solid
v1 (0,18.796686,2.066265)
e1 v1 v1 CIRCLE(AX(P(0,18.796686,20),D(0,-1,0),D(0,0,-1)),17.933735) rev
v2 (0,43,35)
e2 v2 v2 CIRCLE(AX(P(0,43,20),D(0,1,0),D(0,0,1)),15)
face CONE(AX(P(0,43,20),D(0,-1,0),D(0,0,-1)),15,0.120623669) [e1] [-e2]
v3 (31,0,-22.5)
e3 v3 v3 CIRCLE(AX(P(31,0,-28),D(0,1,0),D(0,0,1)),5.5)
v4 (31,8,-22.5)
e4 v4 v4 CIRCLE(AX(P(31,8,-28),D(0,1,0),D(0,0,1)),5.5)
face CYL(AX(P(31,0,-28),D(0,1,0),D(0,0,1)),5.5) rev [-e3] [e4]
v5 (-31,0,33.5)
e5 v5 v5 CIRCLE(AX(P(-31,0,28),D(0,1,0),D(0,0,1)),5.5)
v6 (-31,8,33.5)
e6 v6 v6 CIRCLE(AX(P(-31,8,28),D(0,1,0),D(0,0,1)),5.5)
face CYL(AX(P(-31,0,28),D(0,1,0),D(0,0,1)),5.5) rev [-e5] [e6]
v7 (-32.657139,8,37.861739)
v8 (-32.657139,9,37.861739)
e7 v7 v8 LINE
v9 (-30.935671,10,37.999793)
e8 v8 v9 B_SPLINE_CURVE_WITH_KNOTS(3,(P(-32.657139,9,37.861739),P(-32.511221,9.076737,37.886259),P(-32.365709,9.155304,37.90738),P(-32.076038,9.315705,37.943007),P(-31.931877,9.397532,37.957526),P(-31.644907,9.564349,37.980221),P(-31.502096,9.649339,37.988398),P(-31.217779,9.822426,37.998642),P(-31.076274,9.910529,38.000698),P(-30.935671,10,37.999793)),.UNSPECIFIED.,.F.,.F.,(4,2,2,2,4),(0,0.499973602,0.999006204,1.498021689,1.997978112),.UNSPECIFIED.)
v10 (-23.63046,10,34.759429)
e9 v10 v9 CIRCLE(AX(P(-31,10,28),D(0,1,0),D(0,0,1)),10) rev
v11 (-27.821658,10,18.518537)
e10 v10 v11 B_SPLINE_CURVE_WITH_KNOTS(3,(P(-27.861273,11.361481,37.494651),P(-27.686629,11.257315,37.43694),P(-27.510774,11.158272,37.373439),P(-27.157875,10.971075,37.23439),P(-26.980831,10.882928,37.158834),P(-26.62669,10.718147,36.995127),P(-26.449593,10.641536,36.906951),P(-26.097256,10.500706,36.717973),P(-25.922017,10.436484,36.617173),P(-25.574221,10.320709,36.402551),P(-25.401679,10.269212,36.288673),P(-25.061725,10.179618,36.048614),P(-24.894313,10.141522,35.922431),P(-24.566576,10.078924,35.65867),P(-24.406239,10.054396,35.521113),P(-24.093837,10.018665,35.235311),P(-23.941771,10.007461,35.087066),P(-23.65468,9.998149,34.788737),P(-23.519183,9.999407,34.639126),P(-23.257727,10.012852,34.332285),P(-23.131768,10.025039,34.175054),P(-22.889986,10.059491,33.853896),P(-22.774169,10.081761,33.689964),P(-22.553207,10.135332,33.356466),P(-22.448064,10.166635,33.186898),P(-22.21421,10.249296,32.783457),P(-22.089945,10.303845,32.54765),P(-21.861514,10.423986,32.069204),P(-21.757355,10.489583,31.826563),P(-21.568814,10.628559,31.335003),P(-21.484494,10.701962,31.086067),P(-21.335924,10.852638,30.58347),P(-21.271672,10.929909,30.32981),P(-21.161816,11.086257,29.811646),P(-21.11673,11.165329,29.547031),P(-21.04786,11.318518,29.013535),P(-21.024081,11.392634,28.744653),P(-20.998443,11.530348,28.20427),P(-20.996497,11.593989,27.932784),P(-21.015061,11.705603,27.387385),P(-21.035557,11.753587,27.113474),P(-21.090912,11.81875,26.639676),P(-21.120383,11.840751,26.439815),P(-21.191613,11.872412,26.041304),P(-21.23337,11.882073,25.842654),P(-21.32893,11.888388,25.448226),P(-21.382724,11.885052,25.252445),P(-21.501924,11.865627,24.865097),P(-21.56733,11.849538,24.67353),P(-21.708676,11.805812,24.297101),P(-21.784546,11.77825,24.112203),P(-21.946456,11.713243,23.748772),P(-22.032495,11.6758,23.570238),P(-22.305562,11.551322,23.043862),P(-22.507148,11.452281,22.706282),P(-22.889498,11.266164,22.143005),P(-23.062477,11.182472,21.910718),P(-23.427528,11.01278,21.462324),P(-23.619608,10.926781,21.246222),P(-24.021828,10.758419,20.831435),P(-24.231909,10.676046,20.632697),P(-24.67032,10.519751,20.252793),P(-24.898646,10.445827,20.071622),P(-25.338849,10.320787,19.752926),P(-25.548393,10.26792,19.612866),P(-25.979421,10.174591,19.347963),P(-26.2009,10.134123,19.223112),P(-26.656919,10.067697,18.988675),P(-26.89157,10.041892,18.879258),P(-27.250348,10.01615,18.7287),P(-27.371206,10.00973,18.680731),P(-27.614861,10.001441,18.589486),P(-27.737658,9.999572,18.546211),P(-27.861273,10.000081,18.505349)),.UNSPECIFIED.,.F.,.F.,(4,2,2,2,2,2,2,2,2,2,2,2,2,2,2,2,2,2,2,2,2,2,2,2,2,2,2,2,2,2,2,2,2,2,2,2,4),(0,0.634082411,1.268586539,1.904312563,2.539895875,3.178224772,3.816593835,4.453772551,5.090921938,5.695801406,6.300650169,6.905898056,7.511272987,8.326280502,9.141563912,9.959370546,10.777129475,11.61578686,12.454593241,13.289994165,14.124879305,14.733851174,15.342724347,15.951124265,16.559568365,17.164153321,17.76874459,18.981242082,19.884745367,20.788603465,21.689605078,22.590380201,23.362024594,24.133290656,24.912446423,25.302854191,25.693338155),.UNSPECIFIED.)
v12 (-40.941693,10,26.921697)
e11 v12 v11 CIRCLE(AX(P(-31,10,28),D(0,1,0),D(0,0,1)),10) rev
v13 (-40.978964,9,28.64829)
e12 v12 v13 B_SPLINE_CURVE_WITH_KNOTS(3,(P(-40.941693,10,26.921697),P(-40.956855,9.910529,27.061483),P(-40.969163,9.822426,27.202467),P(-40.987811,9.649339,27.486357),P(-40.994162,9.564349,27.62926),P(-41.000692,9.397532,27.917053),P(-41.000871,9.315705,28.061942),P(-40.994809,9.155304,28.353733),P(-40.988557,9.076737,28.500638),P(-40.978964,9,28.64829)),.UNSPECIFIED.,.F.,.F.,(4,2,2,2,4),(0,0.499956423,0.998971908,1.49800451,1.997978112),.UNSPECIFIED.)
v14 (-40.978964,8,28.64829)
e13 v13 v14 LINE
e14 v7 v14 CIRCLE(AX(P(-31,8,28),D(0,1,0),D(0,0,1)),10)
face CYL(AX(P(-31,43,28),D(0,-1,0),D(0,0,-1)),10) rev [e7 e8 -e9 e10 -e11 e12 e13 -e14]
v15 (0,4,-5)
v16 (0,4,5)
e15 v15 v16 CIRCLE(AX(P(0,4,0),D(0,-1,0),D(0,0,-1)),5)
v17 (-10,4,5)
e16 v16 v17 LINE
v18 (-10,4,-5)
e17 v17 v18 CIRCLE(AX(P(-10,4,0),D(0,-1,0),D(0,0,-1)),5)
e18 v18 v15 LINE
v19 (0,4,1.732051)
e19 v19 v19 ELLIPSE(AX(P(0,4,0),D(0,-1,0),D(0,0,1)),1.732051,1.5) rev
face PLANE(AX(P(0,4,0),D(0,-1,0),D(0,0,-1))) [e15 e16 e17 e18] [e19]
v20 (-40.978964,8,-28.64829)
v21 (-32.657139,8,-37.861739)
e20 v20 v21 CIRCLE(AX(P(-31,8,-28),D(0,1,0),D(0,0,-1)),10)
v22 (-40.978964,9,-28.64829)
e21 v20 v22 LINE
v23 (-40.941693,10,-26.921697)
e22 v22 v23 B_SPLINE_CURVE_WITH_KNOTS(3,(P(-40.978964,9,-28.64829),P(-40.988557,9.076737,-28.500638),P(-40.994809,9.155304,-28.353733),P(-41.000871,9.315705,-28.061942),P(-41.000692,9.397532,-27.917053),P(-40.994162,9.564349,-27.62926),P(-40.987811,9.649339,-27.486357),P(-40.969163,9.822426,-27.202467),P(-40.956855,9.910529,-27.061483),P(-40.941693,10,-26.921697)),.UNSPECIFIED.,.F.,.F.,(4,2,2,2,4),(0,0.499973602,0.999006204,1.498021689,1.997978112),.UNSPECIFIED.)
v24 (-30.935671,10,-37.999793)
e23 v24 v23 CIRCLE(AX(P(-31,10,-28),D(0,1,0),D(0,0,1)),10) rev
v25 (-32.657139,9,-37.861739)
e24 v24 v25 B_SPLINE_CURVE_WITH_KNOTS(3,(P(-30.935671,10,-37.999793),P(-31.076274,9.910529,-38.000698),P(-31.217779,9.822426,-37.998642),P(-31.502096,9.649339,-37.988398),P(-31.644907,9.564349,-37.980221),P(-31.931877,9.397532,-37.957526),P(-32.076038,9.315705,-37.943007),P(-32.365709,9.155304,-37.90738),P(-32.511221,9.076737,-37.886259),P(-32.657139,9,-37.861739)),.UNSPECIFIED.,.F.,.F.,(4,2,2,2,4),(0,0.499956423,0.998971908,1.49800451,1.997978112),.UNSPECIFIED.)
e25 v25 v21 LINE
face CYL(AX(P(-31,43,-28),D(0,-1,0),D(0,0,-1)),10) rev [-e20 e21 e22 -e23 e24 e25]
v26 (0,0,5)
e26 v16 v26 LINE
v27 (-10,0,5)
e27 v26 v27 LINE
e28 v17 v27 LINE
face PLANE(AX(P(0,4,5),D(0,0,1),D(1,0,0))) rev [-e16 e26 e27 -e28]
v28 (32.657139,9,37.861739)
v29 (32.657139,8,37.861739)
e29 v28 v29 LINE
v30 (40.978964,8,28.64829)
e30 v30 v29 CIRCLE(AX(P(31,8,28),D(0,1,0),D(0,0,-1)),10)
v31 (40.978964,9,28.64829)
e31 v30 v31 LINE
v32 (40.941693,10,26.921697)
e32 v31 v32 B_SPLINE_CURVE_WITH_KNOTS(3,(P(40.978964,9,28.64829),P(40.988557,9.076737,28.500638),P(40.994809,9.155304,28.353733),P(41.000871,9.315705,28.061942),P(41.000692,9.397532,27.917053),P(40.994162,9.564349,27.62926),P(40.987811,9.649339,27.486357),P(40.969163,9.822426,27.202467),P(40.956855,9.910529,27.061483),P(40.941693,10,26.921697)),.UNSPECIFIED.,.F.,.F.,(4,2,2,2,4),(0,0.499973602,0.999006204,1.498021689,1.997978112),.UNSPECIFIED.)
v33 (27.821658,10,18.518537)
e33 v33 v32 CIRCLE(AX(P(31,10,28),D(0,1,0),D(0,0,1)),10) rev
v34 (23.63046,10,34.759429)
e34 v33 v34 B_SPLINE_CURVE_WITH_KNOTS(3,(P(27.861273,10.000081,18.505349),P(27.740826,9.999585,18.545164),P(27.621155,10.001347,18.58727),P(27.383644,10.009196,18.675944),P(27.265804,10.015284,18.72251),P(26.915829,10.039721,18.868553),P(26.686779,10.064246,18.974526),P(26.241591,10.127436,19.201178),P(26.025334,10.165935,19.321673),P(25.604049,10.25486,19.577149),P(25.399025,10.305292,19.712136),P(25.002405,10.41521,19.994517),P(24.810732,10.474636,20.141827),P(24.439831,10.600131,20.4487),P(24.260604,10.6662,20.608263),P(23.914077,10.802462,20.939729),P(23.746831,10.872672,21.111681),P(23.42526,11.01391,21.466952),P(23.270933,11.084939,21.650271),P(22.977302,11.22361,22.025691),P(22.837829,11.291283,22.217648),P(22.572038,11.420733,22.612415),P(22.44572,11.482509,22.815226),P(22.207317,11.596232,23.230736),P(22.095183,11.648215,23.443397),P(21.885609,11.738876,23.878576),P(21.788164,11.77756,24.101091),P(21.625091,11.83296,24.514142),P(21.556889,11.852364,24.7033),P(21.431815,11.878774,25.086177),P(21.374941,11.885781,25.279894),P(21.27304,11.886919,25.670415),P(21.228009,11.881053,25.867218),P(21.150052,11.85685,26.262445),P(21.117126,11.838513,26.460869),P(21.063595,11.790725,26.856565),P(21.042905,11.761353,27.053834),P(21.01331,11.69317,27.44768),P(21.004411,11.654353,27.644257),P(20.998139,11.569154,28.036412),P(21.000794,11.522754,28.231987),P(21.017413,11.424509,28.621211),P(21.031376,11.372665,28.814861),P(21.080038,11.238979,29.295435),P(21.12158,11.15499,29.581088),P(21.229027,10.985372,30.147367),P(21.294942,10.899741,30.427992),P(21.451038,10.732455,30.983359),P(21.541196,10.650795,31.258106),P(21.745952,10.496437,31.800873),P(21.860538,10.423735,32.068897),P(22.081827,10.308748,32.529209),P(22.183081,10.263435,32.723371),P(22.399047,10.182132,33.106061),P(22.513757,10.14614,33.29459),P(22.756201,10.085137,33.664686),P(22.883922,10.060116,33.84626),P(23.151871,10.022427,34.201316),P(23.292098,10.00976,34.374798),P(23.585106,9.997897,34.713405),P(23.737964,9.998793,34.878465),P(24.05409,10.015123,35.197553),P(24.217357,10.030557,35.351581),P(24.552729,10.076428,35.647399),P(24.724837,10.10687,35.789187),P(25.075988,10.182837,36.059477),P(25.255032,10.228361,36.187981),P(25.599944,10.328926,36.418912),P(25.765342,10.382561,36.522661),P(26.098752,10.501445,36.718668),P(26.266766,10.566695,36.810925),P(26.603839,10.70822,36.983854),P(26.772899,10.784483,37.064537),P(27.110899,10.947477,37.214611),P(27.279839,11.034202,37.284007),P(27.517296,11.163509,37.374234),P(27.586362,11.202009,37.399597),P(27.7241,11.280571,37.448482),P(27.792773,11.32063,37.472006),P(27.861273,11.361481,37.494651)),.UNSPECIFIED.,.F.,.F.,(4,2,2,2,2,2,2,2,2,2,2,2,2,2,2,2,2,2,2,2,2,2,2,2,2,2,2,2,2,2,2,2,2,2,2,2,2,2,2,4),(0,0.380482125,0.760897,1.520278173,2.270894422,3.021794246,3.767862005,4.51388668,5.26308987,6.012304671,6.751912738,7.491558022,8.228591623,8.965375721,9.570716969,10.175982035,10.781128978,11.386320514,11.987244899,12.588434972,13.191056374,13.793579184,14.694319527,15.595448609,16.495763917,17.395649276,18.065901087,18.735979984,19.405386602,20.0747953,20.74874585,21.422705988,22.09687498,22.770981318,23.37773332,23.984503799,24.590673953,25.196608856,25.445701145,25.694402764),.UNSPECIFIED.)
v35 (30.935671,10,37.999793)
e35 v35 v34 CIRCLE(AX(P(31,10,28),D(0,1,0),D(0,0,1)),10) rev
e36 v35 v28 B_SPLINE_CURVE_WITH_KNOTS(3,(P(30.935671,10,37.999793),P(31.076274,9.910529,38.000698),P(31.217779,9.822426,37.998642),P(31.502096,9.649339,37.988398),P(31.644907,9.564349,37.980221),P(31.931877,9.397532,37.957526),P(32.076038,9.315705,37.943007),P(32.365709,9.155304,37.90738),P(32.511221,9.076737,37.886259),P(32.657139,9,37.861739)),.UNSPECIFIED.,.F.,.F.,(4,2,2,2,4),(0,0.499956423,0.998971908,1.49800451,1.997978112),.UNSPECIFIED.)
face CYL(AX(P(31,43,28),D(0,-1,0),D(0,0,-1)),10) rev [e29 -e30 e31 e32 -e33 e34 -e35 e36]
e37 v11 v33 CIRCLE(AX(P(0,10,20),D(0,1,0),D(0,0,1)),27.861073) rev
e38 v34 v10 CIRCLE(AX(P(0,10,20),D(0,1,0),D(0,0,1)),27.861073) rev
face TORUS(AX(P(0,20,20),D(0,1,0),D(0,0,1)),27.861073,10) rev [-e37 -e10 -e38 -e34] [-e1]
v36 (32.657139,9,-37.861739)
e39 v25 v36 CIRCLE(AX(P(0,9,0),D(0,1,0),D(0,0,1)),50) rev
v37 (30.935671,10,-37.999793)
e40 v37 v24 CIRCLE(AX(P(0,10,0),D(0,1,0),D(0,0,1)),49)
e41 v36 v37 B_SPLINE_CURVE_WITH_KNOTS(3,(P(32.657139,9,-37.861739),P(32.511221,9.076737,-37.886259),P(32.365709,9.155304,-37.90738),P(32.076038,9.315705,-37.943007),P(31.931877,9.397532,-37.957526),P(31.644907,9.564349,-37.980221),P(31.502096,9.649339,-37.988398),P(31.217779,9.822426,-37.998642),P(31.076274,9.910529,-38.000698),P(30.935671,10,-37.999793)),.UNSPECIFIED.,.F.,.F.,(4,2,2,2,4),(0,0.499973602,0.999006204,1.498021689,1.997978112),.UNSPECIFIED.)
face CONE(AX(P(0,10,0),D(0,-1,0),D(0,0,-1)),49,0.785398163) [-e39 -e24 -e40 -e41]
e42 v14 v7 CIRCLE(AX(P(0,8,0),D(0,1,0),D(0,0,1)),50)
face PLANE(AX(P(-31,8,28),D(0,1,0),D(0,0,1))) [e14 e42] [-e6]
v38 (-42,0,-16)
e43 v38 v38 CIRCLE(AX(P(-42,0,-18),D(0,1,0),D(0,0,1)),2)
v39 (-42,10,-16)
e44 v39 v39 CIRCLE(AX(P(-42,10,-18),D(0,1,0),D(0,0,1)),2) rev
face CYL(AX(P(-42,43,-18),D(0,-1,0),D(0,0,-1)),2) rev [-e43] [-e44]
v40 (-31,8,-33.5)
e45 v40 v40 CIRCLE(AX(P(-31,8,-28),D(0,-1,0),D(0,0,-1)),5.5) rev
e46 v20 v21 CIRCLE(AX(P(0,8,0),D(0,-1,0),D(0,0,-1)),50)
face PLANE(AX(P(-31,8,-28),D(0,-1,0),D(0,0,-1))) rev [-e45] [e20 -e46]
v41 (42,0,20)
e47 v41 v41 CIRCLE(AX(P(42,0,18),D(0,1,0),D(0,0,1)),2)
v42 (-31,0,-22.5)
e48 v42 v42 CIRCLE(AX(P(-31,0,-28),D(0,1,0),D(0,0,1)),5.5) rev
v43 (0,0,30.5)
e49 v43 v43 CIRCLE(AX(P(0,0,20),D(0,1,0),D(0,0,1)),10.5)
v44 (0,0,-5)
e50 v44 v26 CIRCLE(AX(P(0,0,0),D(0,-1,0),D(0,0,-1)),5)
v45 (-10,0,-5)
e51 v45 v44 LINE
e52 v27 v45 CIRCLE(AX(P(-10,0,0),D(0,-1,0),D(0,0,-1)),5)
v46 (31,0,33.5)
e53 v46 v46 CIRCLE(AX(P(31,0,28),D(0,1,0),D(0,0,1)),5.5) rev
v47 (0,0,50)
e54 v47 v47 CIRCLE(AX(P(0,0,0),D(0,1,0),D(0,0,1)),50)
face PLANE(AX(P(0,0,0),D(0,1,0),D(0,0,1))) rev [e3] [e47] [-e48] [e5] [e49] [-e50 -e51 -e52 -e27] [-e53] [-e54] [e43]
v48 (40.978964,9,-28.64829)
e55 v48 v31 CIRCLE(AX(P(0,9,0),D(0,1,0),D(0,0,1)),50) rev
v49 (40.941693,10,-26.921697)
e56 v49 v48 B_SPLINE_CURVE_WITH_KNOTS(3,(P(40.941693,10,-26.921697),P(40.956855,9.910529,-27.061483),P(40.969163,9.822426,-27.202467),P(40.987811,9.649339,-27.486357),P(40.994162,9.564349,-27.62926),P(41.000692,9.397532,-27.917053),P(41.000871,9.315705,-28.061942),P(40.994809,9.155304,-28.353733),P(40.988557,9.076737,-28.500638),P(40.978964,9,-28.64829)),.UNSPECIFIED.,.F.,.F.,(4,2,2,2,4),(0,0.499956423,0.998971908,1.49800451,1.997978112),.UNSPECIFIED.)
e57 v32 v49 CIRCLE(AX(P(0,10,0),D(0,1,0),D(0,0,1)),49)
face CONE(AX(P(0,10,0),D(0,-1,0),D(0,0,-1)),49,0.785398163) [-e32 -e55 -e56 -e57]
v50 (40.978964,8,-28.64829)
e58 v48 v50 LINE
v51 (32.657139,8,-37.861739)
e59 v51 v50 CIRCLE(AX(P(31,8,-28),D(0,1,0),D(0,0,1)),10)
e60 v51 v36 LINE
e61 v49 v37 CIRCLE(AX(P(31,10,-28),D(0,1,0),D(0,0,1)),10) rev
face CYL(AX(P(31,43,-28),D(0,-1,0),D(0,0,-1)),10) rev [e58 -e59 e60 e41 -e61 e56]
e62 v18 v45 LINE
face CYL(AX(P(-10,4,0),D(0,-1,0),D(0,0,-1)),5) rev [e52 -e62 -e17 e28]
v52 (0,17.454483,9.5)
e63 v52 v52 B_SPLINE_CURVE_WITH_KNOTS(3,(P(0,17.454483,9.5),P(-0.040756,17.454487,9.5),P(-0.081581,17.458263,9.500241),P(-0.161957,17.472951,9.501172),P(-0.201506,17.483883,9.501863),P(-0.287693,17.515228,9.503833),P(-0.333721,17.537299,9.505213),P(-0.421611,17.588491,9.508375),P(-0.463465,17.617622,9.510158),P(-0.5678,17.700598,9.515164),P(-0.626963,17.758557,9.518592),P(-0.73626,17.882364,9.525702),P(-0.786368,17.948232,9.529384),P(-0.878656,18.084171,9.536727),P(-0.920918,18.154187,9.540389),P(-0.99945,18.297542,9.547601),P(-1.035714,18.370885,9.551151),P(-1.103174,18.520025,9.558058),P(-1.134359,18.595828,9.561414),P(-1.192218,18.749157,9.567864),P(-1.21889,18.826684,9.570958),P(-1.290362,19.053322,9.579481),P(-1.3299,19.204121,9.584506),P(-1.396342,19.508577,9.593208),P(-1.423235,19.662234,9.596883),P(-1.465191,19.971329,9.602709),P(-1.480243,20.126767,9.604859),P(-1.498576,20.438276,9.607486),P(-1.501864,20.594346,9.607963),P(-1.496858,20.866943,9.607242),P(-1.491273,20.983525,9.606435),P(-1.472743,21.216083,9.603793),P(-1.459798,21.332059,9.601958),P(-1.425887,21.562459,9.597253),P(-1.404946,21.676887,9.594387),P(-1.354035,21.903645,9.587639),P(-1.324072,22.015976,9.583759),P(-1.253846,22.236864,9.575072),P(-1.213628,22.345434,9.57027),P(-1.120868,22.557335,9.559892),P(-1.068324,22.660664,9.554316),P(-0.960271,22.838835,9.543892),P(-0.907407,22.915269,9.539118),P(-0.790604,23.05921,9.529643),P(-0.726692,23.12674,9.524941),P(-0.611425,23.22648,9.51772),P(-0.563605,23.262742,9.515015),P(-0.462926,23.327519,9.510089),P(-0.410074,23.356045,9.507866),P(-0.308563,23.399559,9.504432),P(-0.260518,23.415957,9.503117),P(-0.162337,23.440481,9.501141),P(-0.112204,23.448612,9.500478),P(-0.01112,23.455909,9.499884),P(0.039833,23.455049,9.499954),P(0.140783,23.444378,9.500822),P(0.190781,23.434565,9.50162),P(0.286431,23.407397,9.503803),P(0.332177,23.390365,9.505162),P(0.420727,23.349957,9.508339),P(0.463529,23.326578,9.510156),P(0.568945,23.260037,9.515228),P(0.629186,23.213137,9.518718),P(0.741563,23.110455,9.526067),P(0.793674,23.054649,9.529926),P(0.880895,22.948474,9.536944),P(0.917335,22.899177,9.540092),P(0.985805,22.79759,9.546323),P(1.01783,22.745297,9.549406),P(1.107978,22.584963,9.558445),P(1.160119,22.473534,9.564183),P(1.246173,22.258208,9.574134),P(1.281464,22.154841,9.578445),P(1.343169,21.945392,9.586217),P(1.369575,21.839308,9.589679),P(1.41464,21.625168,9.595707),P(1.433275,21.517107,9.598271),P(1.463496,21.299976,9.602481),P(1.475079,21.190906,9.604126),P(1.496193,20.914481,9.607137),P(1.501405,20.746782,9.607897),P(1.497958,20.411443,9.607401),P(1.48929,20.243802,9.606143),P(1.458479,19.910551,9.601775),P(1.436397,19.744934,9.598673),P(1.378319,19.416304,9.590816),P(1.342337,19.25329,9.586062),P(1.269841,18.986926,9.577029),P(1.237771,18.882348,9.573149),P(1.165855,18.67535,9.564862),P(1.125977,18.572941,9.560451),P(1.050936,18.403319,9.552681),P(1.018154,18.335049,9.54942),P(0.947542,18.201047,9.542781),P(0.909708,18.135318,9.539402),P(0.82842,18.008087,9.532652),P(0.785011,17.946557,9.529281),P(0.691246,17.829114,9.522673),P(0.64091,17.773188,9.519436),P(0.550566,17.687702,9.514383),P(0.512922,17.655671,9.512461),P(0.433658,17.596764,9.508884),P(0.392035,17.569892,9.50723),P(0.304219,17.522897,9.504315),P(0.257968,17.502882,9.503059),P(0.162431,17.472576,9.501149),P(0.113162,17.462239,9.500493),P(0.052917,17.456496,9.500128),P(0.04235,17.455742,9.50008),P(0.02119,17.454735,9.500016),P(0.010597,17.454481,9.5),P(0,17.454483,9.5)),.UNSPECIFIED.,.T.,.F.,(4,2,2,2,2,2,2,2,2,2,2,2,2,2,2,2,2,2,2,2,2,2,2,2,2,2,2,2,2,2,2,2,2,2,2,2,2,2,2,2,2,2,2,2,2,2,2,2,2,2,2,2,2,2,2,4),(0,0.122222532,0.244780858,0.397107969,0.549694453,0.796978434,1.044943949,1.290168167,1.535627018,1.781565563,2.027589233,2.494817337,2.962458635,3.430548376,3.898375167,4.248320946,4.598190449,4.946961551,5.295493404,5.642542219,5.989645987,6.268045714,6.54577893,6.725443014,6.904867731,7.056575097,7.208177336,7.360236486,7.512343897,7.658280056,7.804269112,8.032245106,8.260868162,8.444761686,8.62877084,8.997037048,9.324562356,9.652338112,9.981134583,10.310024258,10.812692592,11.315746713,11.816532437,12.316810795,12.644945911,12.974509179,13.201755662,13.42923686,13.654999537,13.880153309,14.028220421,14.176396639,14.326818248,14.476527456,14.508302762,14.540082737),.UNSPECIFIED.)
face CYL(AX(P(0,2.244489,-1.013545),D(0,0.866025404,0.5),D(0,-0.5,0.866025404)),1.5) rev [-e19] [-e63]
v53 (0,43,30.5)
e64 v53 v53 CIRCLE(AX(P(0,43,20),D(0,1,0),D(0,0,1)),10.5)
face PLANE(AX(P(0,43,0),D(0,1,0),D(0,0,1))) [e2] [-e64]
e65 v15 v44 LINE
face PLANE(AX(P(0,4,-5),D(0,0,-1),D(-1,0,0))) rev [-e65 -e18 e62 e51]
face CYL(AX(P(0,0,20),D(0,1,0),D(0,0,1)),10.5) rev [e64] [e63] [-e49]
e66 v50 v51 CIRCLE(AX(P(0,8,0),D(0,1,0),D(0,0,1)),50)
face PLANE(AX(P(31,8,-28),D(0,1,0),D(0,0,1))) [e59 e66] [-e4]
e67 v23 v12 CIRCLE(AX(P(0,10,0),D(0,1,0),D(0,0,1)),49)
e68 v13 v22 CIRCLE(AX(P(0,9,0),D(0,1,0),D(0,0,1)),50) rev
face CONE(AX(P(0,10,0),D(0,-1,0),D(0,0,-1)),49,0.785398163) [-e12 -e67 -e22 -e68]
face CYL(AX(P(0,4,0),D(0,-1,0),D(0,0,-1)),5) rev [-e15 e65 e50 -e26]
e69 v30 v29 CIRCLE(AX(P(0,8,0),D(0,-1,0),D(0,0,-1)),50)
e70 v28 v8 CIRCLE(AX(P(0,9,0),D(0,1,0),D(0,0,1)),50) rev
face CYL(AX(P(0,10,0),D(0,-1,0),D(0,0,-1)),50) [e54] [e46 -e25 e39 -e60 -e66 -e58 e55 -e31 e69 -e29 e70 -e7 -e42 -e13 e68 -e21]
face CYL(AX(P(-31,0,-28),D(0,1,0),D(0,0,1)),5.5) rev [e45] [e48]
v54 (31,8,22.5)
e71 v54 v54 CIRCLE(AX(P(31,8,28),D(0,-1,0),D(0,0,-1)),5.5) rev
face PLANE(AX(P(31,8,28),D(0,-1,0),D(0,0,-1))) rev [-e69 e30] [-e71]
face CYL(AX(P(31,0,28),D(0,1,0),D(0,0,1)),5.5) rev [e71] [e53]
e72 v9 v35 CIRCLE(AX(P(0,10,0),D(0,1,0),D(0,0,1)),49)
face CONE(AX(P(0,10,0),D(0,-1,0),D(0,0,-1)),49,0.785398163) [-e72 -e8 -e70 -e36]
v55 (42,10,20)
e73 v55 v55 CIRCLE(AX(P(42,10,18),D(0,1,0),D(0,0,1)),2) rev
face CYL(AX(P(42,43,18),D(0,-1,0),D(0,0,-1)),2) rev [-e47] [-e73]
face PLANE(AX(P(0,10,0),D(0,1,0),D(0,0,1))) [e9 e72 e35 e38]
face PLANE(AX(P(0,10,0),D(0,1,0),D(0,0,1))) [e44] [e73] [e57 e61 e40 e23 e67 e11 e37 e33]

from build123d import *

# Parameters (mm, degrees)
SKETCH_1_R               = 50
EXTRUDE_1_DEPTH          = 10
FILLET_1_R               = 10
F_1_UN_DEPTH             = 79.0320447
F_1_UN_DEPTH_BACK        = 2
SKETCH_2_R               = 10
SKETCH_2_R_2             = 5.5
CUT_EXTRUDE_3_DEPTH      = 79.0320447
CUT_EXTRUDE_3_DEPTH_BACK = 79.0320447
SKETCH_2_3_R             = 5.5
SKETCH_6_R               = 10.5
CUT_EXTRUDE_4_DEPTH      = 83.758685345
SKETCH_7_R               = 2
CUT_EXTRUDE_6_DEPTH      = 83.758685345
CUT_EXTRUDE_7_DEPTH      = 4
SWEEP_1_OUTLINE_W        = 1.5
SWEEP_1_OUTLINE_H        = 22.476650491
CHAMFER_2_SIZE           = 1


# Read off the part's stored shape, not the designer's step: 切除-扫描1
with BuildPart() as part:
    # 草图1 → 凸台-拉伸1 (new body)
    with BuildSketch(Plane(origin=(0, 0, 0), x_dir=(1, 0, 0), z_dir=(0, 1, 0))):
        with Locations(Location((0, 0, 0), (0, 0, 270))):
            Circle(SKETCH_1_R)
    extrude(amount=EXTRUDE_1_DEPTH)

    # 草图5 → 旋转1 (revolve)
    with BuildSketch(Plane(origin=(0, 0, 0), x_dir=(0, 0, -1), z_dir=(1, 0, 0))):
        Polygon((-20, 10), (-20, 43), (-35, 43), (-39, 10), align=None)
    revolve(axis=Axis((0, 37.278151035, 20), (0, -1, 0)))

    # 圆角1
    fillet_1_edges = [part.edges().sort_by_distance(p)[0] for p in [
        (0, 10, 1),
    ]]
    fillet(fillet_1_edges, radius=FILLET_1_R)

    # 草图2 → 切除-拉伸1 un (cut, two sides: drawn at the far end of the back side and taken through both)
    # profile 1 of 4: a face of its own
    with BuildSketch(Plane(origin=(0, 10, 0), x_dir=(1, 0, 0), z_dir=(0, 1, 0)).offset(-F_1_UN_DEPTH_BACK)):
        with Locations((31, 28)):
            Circle(SKETCH_2_R)
        with Locations(Location((31, 28, 0), (0, 0, 270))):
            Circle(SKETCH_2_R_2, mode=Mode.SUBTRACT)
    # profile 2 of 4: a face of its own
    with BuildSketch(Plane(origin=(0, 10, 0), x_dir=(1, 0, 0), z_dir=(0, 1, 0)).offset(-F_1_UN_DEPTH_BACK)):
        with Locations((-31, 28)):
            Circle(SKETCH_2_R)
        with Locations(Location((-31, 28, 0), (0, 0, 90))):
            Circle(SKETCH_2_R_2, mode=Mode.SUBTRACT)
    # profile 3 of 4: a face of its own
    with BuildSketch(Plane(origin=(0, 10, 0), x_dir=(1, 0, 0), z_dir=(0, 1, 0)).offset(-F_1_UN_DEPTH_BACK)):
        with Locations((-31, -28)):
            Circle(SKETCH_2_R)
        with Locations(Location((-31, -28, 0), (0, 0, 52.073353544))):
            Circle(SKETCH_2_R_2, mode=Mode.SUBTRACT)
    # profile 4 of 4: a face of its own
    with BuildSketch(Plane(origin=(0, 10, 0), x_dir=(1, 0, 0), z_dir=(0, 1, 0)).offset(-F_1_UN_DEPTH_BACK)):
        with Locations((31, -28)):
            Circle(SKETCH_2_R)
        with Locations(Location((31, -28, 0), (0, 0, 90))):
            Circle(SKETCH_2_R_2, mode=Mode.SUBTRACT)
    extrude(amount=F_1_UN_DEPTH + F_1_UN_DEPTH_BACK, mode=Mode.SUBTRACT)

    # 草图2<3> → 切除-拉伸3 (cut, two sides: drawn at the far end of the back side and taken through both)
    with BuildSketch(Plane(origin=(0, 10, 0), x_dir=(1, 0, 0), z_dir=(0, 1, 0)).offset(-CUT_EXTRUDE_3_DEPTH_BACK)):
        with Locations(Location((31, 28, 0), (0, 0, 270))):
            Circle(SKETCH_2_3_R)
        with Locations(Location((-31, 28, 0), (0, 0, 270))):
            Circle(SKETCH_2_3_R)
        with Locations(Location((-31, -28, 0), (0, 0, 270))):
            Circle(SKETCH_2_3_R)
        with Locations(Location((31, -28, 0), (0, 0, 270))):
            Circle(SKETCH_2_3_R)
    extrude(amount=CUT_EXTRUDE_3_DEPTH + CUT_EXTRUDE_3_DEPTH_BACK, mode=Mode.SUBTRACT)

    # 草图6 → 切除-拉伸4 (cut, through all)
    with BuildSketch(Plane(origin=(0, 43, 0), x_dir=(1, 0, 0), z_dir=(0, 1, 0))):
        with Locations(Location((0, -20, 0), (0, 0, 270))):
            Circle(SKETCH_6_R)
    extrude(amount=-CUT_EXTRUDE_4_DEPTH, mode=Mode.SUBTRACT)

    # 草图7 → 切除-拉伸6 (cut, through all)
    with BuildSketch(Plane(origin=(0, 0, 0), x_dir=(1, 0, 0), z_dir=(0, 1, 0))):
        with Locations(Location((42, -18, 0), (0, 0, 270))):
            Circle(SKETCH_7_R)
        with Locations(Location((-42, 18, 0), (0, 0, 270))):
            Circle(SKETCH_7_R)
    extrude(amount=CUT_EXTRUDE_6_DEPTH, mode=Mode.SUBTRACT)

    # 草图8 → 切除-拉伸7 (cut)
    with BuildSketch(Plane.XZ):
        with BuildLine():
            Line((0, -5), (-10, -5))
            ThreePointArc((-10, -5), (-15, 0), (-10, 5))
            Line((-10, 5), (0, 5))
            ThreePointArc((0, 5), (5, 0), (0, -5))
        make_face()
    extrude(amount=-CUT_EXTRUDE_7_DEPTH, mode=Mode.SUBTRACT)

    # 切除-扫描1 outline → 切除-扫描1 (revolve, cut)
    with BuildSketch(Plane(origin=(0, 1, -1.732050808), x_dir=(1, 0, 0), z_dir=(0, -0.5000000000000042, 0.8660254037844363))):
        with Locations((0.75, 13.824548036)):
            Rectangle(SWEEP_1_OUTLINE_W, SWEEP_1_OUTLINE_H)
    revolve(axis=Axis((0, 1, -1.732050808), (0, 0.8660254037844363, 0.5000000000000042)), mode=Mode.SUBTRACT)

    # 倒角2
    chamfer_2_edges = [part.edges().sort_by_distance(p)[0] for p in [
        (50, 10, 0),
        (0, 10, -50),
        (-50, 10, 0),
        (17.420003831, 10, 46.867296343),
    ]]
    chamfer(chamfer_2_edges, length=CHAMFER_2_SIZE)


solid = part.part
